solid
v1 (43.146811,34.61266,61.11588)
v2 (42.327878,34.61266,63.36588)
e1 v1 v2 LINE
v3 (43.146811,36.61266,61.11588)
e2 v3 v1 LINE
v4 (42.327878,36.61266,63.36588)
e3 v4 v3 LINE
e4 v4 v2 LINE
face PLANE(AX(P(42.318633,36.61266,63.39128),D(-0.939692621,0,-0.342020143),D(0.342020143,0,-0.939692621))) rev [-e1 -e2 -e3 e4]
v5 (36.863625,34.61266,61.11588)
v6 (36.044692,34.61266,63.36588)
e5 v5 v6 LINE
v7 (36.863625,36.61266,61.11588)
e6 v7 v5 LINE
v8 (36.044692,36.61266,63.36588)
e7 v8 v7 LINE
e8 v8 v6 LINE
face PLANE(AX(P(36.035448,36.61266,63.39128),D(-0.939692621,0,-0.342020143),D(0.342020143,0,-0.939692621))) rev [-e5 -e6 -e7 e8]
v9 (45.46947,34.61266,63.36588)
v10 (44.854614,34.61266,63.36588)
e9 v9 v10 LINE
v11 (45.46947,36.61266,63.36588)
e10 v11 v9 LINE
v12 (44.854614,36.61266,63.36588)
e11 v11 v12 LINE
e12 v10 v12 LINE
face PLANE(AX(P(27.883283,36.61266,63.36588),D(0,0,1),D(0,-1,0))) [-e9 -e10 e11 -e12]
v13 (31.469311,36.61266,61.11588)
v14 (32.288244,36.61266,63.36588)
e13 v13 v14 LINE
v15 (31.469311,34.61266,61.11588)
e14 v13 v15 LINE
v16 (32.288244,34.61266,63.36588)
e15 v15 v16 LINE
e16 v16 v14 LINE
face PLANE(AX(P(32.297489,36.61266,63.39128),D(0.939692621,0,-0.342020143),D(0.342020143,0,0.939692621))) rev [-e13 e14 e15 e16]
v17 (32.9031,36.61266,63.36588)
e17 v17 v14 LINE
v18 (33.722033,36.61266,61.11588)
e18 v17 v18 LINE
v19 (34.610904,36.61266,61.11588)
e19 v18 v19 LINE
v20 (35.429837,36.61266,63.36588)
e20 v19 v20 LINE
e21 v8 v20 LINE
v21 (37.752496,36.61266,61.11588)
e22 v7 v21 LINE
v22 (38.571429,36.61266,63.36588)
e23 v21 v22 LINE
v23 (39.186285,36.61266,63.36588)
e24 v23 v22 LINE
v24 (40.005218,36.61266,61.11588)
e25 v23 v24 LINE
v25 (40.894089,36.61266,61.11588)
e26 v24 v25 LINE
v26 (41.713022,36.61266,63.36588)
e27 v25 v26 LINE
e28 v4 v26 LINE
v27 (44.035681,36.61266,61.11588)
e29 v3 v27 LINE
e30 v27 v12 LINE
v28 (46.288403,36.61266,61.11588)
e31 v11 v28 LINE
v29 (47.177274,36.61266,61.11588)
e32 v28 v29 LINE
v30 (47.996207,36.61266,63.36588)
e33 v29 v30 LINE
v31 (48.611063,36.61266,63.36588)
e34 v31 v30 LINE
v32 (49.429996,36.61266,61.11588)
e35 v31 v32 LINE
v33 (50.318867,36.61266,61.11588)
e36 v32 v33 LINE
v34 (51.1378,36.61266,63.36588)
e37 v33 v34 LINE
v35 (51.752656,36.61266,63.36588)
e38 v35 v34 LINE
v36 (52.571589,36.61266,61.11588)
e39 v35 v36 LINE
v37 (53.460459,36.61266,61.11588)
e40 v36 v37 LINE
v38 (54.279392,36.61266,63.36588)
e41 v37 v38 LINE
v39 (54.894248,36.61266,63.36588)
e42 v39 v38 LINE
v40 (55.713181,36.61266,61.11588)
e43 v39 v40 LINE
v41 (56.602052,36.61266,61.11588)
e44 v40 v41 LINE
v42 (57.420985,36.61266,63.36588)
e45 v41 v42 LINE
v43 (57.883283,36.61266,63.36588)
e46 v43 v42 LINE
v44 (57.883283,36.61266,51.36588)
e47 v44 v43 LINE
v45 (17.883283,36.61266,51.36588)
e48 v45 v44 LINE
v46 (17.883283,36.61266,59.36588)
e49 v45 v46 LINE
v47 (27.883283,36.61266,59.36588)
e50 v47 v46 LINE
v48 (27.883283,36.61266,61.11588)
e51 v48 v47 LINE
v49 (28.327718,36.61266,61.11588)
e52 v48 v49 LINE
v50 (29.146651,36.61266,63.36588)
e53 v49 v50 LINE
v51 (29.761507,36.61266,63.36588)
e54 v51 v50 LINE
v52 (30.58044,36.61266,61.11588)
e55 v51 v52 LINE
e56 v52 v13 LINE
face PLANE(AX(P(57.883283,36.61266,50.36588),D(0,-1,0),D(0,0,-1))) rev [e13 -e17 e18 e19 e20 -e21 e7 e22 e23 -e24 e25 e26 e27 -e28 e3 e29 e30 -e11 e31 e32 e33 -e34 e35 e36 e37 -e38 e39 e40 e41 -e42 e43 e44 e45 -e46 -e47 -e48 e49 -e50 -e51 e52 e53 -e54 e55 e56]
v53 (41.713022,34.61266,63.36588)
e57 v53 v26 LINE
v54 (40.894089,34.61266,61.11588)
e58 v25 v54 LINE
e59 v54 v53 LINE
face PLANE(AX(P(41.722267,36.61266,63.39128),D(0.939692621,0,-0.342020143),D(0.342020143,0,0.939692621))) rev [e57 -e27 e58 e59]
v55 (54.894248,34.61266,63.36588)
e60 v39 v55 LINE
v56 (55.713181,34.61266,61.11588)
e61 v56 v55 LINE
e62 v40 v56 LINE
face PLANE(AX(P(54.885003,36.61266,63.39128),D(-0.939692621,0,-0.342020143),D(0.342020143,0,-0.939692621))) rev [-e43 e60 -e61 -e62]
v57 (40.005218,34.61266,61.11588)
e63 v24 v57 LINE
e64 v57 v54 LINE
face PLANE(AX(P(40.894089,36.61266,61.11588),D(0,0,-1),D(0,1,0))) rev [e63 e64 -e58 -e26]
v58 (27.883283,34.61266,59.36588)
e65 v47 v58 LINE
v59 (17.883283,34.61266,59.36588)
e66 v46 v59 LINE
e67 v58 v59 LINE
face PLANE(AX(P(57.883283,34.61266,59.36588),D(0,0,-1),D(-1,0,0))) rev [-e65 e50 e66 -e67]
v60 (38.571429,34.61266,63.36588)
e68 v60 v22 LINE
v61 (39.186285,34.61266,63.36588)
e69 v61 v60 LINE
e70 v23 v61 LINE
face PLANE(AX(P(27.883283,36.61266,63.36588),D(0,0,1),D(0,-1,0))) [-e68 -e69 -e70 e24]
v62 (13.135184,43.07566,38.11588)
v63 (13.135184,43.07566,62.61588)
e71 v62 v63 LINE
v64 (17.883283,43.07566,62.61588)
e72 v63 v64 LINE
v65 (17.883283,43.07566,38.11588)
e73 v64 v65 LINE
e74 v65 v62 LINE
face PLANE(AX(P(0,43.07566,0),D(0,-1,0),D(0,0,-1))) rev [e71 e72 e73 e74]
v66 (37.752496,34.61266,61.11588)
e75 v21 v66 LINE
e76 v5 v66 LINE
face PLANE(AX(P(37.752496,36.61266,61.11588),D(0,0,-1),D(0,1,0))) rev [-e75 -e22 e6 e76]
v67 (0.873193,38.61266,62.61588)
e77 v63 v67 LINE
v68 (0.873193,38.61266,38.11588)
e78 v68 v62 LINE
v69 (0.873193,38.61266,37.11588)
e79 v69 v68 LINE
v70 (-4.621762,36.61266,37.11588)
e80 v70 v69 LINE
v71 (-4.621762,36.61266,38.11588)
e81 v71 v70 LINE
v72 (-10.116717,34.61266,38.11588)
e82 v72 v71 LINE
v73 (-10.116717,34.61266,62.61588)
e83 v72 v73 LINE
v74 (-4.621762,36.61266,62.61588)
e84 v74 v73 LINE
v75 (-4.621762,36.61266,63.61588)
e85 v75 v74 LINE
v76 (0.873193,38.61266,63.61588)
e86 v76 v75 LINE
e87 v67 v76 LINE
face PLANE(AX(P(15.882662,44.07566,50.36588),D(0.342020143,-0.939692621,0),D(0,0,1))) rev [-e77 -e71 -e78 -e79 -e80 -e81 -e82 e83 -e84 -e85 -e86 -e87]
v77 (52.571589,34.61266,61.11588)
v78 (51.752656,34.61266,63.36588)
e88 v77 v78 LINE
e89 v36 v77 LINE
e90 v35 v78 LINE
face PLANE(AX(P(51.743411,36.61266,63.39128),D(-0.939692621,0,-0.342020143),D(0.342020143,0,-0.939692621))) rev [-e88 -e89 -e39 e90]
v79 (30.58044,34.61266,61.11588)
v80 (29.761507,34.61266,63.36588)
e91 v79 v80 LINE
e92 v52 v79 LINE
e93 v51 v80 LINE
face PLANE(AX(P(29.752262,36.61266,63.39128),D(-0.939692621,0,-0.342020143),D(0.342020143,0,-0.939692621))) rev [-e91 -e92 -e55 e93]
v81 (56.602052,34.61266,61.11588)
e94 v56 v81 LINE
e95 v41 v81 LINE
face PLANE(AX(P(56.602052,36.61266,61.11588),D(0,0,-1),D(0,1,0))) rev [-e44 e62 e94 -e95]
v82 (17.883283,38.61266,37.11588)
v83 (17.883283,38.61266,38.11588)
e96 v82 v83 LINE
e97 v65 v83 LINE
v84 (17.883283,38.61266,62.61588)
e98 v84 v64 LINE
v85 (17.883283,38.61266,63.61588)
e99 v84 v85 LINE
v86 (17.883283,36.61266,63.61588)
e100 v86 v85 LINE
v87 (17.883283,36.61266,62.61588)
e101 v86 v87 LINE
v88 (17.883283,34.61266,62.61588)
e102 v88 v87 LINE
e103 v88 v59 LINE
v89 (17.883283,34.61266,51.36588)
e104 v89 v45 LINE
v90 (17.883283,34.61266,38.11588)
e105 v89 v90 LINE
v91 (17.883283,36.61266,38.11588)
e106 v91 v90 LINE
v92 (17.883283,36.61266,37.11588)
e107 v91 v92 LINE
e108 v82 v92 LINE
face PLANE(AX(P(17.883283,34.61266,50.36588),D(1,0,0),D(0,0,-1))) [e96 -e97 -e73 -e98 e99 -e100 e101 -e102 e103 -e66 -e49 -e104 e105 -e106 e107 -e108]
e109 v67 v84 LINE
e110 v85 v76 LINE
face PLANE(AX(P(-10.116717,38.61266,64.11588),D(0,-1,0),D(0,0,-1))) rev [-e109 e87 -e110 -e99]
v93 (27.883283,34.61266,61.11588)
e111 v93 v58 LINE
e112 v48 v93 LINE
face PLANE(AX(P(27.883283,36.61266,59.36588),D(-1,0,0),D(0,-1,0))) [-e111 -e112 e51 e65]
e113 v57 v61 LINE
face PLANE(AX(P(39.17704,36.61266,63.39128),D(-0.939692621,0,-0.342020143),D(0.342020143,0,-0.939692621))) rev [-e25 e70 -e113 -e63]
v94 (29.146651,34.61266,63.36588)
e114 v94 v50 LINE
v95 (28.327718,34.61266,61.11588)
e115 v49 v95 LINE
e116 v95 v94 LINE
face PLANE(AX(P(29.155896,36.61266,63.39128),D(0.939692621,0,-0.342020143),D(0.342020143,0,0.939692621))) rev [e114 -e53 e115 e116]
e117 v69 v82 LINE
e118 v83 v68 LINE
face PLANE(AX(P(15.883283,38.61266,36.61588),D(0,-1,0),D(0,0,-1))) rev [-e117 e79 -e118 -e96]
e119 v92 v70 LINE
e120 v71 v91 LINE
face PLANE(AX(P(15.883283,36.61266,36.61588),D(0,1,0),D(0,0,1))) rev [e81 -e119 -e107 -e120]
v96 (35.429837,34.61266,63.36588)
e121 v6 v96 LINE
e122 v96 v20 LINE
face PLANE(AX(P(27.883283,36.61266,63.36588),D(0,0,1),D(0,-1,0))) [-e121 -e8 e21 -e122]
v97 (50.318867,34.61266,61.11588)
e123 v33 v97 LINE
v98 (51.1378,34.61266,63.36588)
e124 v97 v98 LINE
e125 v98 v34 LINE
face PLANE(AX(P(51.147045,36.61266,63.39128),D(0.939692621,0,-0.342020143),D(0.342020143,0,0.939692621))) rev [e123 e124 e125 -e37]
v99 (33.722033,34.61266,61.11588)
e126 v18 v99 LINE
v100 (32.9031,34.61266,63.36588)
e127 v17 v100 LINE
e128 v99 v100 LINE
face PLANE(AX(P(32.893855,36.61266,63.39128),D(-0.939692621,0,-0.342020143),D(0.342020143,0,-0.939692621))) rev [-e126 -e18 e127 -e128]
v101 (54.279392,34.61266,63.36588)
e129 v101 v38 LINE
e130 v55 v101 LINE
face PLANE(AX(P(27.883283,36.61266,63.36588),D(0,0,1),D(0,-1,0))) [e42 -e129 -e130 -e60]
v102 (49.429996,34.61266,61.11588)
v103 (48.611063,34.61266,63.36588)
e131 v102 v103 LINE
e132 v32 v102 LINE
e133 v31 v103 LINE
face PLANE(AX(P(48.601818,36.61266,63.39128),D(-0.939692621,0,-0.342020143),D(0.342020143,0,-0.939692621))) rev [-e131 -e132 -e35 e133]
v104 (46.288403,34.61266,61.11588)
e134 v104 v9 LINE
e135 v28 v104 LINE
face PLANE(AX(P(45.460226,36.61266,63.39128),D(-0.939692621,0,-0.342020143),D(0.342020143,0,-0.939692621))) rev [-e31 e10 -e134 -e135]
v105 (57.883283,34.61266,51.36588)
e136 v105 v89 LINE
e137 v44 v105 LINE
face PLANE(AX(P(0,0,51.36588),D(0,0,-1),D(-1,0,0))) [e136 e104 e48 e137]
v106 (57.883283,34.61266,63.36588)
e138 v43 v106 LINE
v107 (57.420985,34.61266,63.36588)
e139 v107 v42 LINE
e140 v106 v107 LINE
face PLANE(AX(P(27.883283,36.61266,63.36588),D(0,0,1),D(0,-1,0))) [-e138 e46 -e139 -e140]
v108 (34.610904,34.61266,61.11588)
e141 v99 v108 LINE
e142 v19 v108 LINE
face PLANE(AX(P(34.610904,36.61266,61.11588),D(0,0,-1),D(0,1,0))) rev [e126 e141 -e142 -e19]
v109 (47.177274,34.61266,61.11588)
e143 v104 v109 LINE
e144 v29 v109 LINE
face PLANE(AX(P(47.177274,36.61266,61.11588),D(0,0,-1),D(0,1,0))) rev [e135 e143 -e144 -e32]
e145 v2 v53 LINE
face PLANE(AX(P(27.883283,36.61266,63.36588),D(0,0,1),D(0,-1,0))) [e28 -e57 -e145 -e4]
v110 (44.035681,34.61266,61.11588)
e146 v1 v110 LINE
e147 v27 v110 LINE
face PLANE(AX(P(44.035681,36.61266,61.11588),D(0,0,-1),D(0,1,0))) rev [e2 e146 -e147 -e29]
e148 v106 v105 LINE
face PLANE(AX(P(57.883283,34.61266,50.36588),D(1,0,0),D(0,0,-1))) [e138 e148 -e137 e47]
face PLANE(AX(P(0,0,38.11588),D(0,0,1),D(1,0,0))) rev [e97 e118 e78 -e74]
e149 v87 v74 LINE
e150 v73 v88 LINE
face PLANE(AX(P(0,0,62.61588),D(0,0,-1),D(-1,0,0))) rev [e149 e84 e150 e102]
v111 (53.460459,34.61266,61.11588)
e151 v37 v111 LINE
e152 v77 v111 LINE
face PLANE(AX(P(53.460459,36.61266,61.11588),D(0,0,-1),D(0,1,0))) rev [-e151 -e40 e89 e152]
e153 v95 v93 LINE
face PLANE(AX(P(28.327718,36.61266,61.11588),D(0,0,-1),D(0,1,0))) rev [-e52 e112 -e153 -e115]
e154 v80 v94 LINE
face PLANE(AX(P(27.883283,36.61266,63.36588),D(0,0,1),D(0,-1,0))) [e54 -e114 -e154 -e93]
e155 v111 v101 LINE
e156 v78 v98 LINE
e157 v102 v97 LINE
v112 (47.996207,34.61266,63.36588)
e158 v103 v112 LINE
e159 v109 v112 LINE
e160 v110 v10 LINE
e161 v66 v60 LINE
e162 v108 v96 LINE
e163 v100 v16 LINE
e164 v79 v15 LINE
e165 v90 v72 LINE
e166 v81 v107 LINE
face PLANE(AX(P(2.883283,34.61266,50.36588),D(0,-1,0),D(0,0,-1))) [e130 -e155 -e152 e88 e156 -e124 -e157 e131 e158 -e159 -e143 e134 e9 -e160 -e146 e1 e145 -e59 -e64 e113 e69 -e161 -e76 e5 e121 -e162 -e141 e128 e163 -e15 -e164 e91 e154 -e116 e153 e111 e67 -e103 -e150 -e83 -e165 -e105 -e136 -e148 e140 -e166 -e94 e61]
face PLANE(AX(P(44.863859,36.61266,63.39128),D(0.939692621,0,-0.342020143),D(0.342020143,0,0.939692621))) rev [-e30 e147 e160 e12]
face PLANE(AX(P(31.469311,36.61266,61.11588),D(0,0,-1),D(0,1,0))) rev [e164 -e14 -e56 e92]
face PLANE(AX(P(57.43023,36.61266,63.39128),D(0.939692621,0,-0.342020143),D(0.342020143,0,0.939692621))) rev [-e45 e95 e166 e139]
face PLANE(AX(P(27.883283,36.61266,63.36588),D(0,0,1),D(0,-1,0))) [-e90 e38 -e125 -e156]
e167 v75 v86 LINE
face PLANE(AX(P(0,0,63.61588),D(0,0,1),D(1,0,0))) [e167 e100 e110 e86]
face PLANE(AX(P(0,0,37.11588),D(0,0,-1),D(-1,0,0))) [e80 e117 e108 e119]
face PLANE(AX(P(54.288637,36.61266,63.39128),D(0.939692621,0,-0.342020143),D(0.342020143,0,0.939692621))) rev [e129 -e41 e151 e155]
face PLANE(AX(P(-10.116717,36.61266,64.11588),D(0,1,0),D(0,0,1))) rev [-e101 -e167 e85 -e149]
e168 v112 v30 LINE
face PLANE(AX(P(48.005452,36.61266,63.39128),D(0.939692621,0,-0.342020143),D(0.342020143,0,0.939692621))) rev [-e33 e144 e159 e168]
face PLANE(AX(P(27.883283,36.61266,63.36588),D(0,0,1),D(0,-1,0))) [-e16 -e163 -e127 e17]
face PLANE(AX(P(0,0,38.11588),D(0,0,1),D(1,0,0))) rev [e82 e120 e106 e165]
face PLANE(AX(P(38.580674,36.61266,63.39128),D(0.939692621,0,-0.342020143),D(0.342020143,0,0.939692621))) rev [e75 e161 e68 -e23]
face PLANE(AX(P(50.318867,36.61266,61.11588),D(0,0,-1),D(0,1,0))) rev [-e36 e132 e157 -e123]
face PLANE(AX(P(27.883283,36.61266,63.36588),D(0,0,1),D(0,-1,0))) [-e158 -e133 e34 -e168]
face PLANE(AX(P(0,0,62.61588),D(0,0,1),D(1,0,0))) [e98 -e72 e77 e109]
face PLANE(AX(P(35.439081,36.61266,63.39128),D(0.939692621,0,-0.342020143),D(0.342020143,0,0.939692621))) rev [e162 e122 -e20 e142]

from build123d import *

# Parameters (mm, degrees)
COMBINE1_START     = 34.612659565
COMBINE1_DEPTH     = 2
COMBINE1_START_2   = 37.615879947
COMBINE1_2_DEPTH   = 25.5
COMBINE1_START_3   = 36.615879947
COMBINE1_3_DEPTH   = 27.5
CUT_EXTRUDE1_DEPTH = 0.5
CUT_EXTRUDE2_DEPTH = 0.5
CUT_EXTRUDE3_DEPTH = 0.5
CUT_EXTRUDE5_DEPTH = 0.5
SKETCH9_W          = 5
SKETCH9_H          = 24.5
CUT_EXTRUDE6_DEPTH = 1
SKETCH10_W         = 40
SKETCH10_H         = 2
CUT_EXTRUDE7_DEPTH = 1


with BuildPart() as part:
    # Combine1: read off the stored shape, not the designer's step
    # Combine1 outline → Combine1 (new body)
    with BuildSketch(Plane(origin=(0, 0, 0), x_dir=(1, 0, 0), z_dir=(0, 1, 0)).offset(COMBINE1_START)):
        Polygon((17.883282848, -59.365879947), (27.883282848, -59.365879947), (27.883282848, -61.115879947), (28.327718217, -61.115879947), (29.146651244, -63.365879947), (29.761507101, -63.365879947), (30.580440128, -61.115879947), (31.469310867, -61.115879947), (32.288243894, -63.365879947), (32.903099751, -63.365879947), (33.722032778, -61.115879947), (34.610903517, -61.115879947), (35.429836544, -63.365879947), (36.044692401, -63.365879947), (36.863625428, -61.115879947), (37.752496167, -61.115879947), (38.571429194, -63.365879947), (39.186285051, -63.365879947), (40.005218078, -61.115879947), (40.894088817, -61.115879947), (41.713021844, -63.365879947), (42.327877701, -63.365879947), (43.146810728, -61.115879947), (44.035681467, -61.115879947), (44.854614494, -63.365879947), (45.469470351, -63.365879947), (46.288403378, -61.115879947), (47.177274117, -61.115879947), (47.996207144, -63.365879947), (48.611063001, -63.365879947), (49.429996028, -61.115879947), (50.318866767, -61.115879947), (51.137799794, -63.365879947), (51.752655651, -63.365879947), (52.571588678, -61.115879947), (53.460459417, -61.115879947), (54.279392444, -63.365879947), (54.894248301, -63.365879947), (55.713181328, -61.115879947), (56.602052067, -61.115879947), (57.420985094, -63.365879947), (57.883282848, -63.365879947), (57.883282848, -50.365879947), (17.883282848, -50.365879947), align=None)
    extrude(amount=COMBINE1_DEPTH)

    # Combine1 2 outline → Combine1 2 (add)
    with BuildSketch(Plane.XY.offset(COMBINE1_START_2)):
        Polygon((17.883282848, 44.075659565), (15.882661668, 44.075659565), (-10.116717152, 34.612659565), (17.883282848, 34.612659565), align=None)
    extrude(amount=COMBINE1_2_DEPTH)

    # Combine1 3 outline → Combine1 3 (add)
    with BuildSketch(Plane.XY.offset(COMBINE1_START_3)):
        Polygon((17.883282848, 38.612659565), (0.873192525, 38.612659565), (-4.621762313, 36.612659565), (17.883282848, 36.612659565), align=None)
    extrude(amount=COMBINE1_3_DEPTH)

    # Sketch2 → Cut-Extrude1 (cut)
    with BuildSketch(Plane.XY.offset(63.115879947)):
        Polygon((0.873192525, 38.612659565), (15.882661668, 44.075659565), (17.883282848, 44.075659565), (17.883282848, 38.612659565), align=None)
        Polygon((17.883282848, 36.612659565), (17.883282848, 34.612659565), (-10.116717152, 34.612659565), (-4.621762313, 36.612659565), align=None)
    extrude(amount=-CUT_EXTRUDE1_DEPTH, mode=Mode.SUBTRACT)

    # Sketch3 → Cut-Extrude2 (cut)
    with BuildSketch(Plane.XY.offset(64.115879947)):
        Polygon((17.883282848, 36.612659565), (17.883282848, 38.612659565), (0.873192525, 38.612659565), (-4.621762313, 36.612659565), align=None)
    extrude(amount=-CUT_EXTRUDE2_DEPTH, mode=Mode.SUBTRACT)

    # Sketch4 → Cut-Extrude3 (cut)
    with BuildSketch(Plane(origin=(0, 0, 37.615879947), x_dir=(-1, 0, 0), z_dir=(0, 0, -1))):
        Polygon((-17.883282848, 38.612659565), (-17.883282848, 44.075659565), (-15.882661668, 44.075659565), (-0.873192525, 38.612659565), align=None)
        Polygon((-17.883282848, 36.612659565), (4.621762313, 36.612659565), (10.116717152, 34.612659565), (-17.883282848, 34.612659565), align=None)
    extrude(amount=-CUT_EXTRUDE3_DEPTH, mode=Mode.SUBTRACT)

    # Sketch7 → Cut-Extrude5 (cut)
    with BuildSketch(Plane(origin=(0, 0, 36.615879947), x_dir=(-1, 0, 0), z_dir=(0, 0, -1))):
        Polygon((-17.883282848, 38.612659565), (-17.883282848, 36.612659565), (4.621762313, 36.612659565), (-0.873192525, 38.612659565), align=None)
    extrude(amount=-CUT_EXTRUDE5_DEPTH, mode=Mode.SUBTRACT)

    # Sketch9 → Cut-Extrude6 (cut)
    with BuildSketch(Plane(origin=(0, 44.075659565, 0), x_dir=(1, 0, 0), z_dir=(0, 1, 0))):
        with Locations((15.383282848, -50.365879947)):
            Rectangle(SKETCH9_W, SKETCH9_H)
    extrude(amount=-CUT_EXTRUDE6_DEPTH, mode=Mode.SUBTRACT)

    # Sketch10 → Cut-Extrude7 (cut)
    with BuildSketch(Plane(origin=(0, 0, 50.365879947), x_dir=(-1, 0, 0), z_dir=(0, 0, -1))):
        with Locations((-37.883282848, 35.612659565)):
            Rectangle(SKETCH10_W, SKETCH10_H)
    extrude(amount=-CUT_EXTRUDE7_DEPTH, mode=Mode.SUBTRACT)


solid = part.part
